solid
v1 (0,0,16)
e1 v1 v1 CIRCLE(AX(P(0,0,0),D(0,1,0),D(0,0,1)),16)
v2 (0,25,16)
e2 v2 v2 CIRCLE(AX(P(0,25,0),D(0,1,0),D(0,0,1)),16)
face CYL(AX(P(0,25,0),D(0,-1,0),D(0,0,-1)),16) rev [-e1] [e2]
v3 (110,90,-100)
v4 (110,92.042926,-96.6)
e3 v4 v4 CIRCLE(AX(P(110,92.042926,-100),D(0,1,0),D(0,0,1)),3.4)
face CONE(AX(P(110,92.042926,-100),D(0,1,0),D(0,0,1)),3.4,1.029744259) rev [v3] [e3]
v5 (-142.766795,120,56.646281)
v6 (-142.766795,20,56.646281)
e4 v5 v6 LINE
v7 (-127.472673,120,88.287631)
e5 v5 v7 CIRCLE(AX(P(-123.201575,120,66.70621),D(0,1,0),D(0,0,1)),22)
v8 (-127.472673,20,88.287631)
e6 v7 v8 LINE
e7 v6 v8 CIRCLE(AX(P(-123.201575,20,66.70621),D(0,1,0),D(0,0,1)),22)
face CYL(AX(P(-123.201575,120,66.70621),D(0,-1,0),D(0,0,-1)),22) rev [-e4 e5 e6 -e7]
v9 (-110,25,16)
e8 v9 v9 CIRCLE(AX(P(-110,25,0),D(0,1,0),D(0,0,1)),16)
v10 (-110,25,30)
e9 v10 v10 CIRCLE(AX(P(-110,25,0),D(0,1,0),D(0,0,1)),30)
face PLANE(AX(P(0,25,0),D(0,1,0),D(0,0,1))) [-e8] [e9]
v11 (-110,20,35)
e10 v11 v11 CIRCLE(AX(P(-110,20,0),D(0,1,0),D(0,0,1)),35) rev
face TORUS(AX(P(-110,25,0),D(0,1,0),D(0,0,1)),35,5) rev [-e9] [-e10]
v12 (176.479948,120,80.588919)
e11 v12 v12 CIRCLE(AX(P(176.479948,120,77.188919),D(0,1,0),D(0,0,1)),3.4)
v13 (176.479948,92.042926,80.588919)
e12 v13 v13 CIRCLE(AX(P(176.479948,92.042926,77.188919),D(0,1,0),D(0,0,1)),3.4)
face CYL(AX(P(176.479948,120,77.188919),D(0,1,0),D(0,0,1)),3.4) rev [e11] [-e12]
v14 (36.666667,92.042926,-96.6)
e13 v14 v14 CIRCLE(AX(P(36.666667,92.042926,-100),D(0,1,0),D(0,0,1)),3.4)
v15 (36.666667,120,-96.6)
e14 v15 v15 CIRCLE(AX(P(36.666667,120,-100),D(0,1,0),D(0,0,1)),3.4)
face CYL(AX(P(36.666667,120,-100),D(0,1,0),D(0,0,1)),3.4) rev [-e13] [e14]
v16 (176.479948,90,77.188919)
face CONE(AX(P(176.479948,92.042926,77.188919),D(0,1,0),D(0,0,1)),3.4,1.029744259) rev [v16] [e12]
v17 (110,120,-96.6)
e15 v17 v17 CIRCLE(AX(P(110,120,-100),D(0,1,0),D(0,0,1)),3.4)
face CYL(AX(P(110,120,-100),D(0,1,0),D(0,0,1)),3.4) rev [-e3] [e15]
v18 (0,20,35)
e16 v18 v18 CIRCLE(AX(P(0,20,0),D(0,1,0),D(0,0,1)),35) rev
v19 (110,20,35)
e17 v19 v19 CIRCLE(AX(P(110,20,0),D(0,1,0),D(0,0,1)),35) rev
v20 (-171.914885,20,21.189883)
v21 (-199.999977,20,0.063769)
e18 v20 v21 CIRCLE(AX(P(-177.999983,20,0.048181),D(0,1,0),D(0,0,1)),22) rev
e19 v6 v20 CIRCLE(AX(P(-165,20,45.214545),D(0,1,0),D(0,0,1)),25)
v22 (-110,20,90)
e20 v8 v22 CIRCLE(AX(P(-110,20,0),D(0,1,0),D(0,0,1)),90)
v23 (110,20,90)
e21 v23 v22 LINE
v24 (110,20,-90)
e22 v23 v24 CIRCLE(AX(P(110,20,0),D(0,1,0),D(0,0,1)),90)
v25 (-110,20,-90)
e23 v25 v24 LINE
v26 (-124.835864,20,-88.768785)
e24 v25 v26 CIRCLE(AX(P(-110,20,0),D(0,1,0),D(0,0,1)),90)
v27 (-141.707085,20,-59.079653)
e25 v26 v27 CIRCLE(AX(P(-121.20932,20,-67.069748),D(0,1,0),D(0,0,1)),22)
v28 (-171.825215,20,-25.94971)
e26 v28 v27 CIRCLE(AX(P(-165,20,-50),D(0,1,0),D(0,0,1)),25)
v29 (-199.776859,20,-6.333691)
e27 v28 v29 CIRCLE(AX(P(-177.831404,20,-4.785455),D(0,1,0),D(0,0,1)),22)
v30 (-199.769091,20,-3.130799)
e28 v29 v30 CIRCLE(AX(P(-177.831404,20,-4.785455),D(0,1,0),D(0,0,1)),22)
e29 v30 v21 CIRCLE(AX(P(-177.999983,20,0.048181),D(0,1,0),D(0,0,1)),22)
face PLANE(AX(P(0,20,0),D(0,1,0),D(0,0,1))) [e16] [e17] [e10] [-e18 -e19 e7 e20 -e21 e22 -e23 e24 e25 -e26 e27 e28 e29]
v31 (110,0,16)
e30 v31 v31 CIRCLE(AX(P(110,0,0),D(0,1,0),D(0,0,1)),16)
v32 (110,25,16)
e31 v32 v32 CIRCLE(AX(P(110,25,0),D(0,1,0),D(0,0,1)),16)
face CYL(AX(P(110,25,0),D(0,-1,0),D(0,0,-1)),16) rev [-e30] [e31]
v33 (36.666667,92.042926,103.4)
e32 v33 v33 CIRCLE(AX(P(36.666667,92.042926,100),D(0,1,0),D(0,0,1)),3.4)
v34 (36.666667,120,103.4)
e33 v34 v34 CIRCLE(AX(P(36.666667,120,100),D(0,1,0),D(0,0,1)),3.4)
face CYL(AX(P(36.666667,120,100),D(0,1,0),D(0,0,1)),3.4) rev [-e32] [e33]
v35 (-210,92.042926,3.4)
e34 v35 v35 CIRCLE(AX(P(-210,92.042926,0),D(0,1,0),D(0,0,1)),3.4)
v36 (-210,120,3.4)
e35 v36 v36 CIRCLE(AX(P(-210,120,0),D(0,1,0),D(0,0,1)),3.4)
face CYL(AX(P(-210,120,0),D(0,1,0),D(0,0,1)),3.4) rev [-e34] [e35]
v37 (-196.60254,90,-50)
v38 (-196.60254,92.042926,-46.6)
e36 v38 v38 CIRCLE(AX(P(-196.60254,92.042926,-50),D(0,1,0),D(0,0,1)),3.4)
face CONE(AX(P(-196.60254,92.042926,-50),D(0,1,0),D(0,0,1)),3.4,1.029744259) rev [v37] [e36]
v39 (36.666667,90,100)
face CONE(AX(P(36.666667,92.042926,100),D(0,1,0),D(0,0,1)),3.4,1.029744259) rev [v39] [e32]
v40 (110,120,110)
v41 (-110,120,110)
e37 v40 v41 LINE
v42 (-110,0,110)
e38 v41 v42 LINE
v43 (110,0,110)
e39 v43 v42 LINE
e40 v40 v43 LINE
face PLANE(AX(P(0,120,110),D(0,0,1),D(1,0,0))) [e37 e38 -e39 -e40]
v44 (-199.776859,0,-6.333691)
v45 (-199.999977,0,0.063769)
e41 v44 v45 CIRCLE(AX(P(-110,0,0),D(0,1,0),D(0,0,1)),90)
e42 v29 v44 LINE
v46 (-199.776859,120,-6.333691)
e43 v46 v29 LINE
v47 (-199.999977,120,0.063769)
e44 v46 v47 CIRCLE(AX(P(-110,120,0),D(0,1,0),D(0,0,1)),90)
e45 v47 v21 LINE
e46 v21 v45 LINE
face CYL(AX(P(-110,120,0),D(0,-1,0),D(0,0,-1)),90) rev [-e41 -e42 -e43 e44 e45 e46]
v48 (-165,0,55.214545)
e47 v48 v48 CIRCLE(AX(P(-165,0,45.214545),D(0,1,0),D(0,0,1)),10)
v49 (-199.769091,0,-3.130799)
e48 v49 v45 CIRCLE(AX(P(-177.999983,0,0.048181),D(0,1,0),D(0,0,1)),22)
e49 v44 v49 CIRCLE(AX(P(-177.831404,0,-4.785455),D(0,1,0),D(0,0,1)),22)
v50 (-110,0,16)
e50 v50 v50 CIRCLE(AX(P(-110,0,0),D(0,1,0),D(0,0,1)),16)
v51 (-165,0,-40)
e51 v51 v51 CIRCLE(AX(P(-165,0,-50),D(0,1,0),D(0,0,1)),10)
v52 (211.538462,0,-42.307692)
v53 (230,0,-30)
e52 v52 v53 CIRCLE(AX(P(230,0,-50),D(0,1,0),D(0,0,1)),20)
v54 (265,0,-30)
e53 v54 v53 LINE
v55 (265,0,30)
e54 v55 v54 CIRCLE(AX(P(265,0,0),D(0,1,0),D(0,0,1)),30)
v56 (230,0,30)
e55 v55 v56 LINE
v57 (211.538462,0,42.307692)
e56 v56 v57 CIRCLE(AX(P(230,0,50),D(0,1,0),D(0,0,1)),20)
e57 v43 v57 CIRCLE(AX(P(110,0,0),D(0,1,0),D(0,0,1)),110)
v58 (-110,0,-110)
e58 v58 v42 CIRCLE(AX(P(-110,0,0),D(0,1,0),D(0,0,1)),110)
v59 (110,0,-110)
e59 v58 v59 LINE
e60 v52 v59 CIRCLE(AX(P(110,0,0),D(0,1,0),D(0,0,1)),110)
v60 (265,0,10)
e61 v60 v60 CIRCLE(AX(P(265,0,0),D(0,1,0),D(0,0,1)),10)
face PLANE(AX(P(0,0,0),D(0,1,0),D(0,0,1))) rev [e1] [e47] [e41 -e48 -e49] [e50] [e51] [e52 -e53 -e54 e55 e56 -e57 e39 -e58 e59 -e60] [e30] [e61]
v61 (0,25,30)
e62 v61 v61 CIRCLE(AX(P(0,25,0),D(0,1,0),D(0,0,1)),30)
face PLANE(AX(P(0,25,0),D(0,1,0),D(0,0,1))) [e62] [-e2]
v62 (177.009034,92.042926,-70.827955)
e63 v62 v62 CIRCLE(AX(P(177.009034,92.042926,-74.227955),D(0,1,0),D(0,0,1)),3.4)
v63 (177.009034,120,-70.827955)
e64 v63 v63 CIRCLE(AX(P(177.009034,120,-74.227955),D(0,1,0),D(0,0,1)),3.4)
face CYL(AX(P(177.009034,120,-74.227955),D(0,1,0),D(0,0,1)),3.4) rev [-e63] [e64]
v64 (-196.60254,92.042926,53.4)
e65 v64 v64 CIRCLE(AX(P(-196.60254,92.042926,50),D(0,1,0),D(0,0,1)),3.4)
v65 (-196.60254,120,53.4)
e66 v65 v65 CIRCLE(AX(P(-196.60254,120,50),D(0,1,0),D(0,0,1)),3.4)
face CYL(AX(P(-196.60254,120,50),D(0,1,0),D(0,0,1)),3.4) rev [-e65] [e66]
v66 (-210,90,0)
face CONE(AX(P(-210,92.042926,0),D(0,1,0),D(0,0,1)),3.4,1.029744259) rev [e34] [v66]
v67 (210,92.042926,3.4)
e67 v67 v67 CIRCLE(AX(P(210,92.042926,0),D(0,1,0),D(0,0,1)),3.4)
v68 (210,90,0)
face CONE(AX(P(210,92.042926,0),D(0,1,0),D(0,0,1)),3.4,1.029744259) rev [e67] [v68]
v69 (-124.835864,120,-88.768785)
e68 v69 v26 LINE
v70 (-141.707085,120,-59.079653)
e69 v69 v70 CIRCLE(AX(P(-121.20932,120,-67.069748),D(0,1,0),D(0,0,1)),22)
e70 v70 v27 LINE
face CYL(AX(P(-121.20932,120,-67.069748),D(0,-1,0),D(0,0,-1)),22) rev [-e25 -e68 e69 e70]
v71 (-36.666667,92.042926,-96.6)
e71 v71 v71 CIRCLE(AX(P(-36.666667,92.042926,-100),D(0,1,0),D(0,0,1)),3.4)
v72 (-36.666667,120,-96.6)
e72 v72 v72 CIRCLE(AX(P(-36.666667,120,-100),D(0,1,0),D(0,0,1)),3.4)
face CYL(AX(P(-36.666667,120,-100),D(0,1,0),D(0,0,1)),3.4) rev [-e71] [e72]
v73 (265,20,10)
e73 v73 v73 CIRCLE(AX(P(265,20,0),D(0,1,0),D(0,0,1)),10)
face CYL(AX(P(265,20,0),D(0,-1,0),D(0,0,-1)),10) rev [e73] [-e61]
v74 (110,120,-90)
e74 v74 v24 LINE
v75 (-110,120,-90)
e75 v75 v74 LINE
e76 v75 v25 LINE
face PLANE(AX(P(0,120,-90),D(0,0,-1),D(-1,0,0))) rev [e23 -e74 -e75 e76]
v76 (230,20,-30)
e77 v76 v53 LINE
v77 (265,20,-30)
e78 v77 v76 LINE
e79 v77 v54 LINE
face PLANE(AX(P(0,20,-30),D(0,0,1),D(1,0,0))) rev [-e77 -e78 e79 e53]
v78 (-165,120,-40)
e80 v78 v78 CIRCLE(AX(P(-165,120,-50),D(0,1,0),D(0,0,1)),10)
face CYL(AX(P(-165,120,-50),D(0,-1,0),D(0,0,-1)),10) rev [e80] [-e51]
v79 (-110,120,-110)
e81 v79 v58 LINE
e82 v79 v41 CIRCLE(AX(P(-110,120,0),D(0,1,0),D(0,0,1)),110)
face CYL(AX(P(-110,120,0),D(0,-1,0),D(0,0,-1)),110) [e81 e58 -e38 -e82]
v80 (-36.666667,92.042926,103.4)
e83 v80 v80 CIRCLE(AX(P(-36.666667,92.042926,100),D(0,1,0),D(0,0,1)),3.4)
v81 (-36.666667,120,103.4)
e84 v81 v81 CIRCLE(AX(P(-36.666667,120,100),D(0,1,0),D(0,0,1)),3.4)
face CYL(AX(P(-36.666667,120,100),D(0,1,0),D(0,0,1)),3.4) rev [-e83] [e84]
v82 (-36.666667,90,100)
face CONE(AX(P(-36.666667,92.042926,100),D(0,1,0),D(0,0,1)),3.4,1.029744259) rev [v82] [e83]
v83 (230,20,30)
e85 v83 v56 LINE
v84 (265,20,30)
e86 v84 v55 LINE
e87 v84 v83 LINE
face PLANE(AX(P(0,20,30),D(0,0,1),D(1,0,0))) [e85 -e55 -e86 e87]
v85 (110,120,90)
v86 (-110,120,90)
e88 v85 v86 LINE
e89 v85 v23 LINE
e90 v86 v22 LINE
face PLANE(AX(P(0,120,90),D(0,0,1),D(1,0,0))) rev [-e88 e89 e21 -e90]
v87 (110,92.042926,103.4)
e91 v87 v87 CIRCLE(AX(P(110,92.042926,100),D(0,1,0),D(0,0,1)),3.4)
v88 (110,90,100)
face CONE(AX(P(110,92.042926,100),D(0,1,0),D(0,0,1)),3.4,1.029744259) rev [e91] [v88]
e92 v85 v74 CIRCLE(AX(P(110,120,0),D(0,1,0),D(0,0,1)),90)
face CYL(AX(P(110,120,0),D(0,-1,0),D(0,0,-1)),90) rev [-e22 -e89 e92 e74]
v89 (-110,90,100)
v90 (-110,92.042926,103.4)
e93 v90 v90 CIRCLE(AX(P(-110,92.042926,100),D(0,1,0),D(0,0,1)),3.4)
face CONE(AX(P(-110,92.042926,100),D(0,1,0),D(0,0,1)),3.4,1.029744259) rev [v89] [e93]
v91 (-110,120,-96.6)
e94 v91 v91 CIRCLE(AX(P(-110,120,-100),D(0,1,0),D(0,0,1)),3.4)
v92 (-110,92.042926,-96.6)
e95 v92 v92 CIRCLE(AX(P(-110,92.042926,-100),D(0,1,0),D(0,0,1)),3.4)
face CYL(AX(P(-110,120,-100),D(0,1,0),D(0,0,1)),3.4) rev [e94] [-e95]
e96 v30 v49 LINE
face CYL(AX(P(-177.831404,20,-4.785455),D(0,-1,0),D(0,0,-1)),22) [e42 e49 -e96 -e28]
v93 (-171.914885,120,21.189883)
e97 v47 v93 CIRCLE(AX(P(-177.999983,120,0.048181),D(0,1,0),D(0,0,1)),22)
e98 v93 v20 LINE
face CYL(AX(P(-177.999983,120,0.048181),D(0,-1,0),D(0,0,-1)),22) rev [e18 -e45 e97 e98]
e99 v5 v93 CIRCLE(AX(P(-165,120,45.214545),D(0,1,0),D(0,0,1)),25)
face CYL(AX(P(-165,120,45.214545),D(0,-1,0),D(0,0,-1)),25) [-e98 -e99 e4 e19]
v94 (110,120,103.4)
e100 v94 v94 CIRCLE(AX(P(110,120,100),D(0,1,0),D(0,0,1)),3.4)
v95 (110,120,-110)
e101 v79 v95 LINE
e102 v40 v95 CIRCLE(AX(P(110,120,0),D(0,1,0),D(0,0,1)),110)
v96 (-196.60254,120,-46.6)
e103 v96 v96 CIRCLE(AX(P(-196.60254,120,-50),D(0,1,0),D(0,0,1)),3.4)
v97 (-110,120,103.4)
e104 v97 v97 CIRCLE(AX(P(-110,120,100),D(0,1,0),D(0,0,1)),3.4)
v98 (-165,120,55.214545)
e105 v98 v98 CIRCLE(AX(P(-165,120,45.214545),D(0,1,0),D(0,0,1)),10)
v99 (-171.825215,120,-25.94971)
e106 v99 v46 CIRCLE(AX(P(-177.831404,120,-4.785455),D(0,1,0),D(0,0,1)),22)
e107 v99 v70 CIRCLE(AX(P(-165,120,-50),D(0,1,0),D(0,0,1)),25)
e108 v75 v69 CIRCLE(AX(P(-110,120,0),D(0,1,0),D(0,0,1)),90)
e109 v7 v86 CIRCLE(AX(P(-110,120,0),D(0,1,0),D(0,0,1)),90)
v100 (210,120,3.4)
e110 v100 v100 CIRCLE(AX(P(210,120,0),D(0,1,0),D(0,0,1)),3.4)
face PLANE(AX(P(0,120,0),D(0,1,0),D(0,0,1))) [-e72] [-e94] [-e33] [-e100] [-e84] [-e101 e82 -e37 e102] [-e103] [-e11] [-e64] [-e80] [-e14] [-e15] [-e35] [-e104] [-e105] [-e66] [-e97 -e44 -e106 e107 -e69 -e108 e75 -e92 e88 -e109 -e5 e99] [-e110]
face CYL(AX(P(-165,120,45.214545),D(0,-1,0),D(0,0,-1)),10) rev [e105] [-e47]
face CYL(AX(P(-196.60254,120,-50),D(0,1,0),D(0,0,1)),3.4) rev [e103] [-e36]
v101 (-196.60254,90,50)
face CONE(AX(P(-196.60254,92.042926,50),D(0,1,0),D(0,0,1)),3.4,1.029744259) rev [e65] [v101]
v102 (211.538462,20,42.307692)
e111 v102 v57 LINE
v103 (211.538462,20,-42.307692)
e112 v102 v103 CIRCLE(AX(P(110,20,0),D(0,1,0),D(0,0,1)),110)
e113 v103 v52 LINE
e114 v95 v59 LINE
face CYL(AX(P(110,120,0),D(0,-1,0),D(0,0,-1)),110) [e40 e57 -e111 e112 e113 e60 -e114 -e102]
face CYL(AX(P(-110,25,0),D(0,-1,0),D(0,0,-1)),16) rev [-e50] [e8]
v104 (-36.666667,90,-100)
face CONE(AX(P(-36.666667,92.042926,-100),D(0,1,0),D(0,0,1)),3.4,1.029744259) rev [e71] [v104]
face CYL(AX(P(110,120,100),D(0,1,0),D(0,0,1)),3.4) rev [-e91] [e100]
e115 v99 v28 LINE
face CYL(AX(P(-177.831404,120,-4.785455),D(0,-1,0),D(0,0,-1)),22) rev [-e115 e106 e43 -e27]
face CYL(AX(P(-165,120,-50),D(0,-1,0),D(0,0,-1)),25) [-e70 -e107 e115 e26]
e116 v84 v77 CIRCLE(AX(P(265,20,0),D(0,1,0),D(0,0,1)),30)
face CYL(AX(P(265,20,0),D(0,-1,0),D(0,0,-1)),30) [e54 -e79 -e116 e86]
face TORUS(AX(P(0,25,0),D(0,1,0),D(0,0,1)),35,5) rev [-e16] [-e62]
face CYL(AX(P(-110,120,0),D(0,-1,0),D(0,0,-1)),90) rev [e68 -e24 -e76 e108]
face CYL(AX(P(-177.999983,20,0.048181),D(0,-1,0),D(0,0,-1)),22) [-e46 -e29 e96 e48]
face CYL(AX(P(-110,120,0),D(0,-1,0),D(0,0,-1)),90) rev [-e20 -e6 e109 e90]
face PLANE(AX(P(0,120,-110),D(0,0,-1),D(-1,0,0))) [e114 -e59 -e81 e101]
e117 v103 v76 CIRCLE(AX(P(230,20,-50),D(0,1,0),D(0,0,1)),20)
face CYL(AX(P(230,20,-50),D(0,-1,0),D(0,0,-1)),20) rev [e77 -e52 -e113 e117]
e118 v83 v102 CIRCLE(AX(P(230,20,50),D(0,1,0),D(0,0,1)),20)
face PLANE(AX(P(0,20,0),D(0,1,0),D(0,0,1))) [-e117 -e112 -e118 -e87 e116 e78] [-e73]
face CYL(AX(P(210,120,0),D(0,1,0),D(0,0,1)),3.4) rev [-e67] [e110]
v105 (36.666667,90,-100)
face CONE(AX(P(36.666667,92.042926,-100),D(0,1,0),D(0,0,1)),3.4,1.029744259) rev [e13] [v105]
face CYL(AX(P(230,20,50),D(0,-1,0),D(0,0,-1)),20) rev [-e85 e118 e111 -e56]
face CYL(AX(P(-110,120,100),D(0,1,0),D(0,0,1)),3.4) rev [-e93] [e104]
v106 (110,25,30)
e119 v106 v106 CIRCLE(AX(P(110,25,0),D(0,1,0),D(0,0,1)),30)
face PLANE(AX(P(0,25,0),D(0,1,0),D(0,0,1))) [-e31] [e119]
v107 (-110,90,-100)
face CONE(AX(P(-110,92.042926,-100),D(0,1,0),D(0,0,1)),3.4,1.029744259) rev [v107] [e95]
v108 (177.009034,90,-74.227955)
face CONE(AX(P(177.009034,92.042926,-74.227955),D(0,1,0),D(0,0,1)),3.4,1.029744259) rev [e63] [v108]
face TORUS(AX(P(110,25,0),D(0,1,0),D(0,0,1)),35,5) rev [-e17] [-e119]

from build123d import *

# Parameters (mm, degrees)
ESBO_O2_R                                      = 30
RESSALTO_EXTRUS_O1_DEPTH                       = 20
ESBO_O2_3_R                                    = 30
ESBO_O2_3_R_2                                  = 16
RESSALTO_EXTRUS_O2_DEPTH                       = 25
FILETE1_R                                      = 5
ESBO_O2_4_R                                    = 10
RESSALTO_EXTRUS_O3_DEPTH                       = 120
ESBO_O2_5_R                                    = 10
RESSALTO_EXTRUS_O4_DEPTH                       = 20
BROCA_DE_ROSQUEAR_PARA_TARRAXA_DE_M8X1_2_D     = 6.8
BROCA_DE_ROSQUEAR_PARA_TARRAXA_DE_M8X1_2_DEPTH = 18.127073895
BROCA_DE_ROSQUEAR_PARA_TARRAXA_DE_M8X1_2_TIP   = 2.042926105
BROCA_DE_ROSQUEAR_PARA_TARRAXA_DE_M1_2X0_D     = 6.8
BROCA_DE_ROSQUEAR_PARA_TARRAXA_DE_M1_2X0_DEPTH = 27.957073895
BROCA_DE_ROSQUEAR_PARA_TARRAXA_DE_M1_2X0_TIP   = 2.042926105


with BuildPart() as part:
    # Esboço2 → Ressalto-extrusão1 (new body)
    with BuildSketch(Plane(origin=(0, 0, 0), x_dir=(1, 0, 0), z_dir=(0, 1, 0))):
        with BuildLine():
            ThreePointArc((-142.766795178, -56.646281478), (-143.009054758, -76.280328146), (-127.472672708, -88.287630552))
            ThreePointArc((-127.472672708, -88.287630552), (-118.778190313, -89.570884638), (-110, -90))
            Line((-110, -90), (110, -90))
            ThreePointArc((110, -90), (200, 0), (110, 90))
            Line((110, 90), (-110, 90))
            ThreePointArc((-110, 90), (-117.443432635, 89.691668011), (-124.835864194, 88.76878468))
            ThreePointArc((-124.835864194, 88.76878468), (-140.336700784, 77.939122352), (-141.707084901, 59.079653418))
            ThreePointArc((-141.707084901, 59.079653418), (-146.501498165, 33.18318015), (-171.82521509, 25.94971021))
            ThreePointArc((-171.82521509, 25.94971021), (-191.746461977, 21.825736054), (-199.769091443, 3.130799391))
            ThreePointArc((-199.769091443, 3.130799391), (-192.469638839, -16.620116582), (-171.914884538, -21.189883063))
            ThreePointArc((-171.914884538, -21.189883063), (-145.688040461, -29.338518263), (-142.766795178, -56.646281478))
        make_face()
        with Locations(Location((-110, 0, 0), (0, 0, 270))):
            Circle(ESBO_O2_R, mode=Mode.SUBTRACT)
        with Locations(Location((0, 0, 0), (0, 0, 270))):
            Circle(ESBO_O2_R, mode=Mode.SUBTRACT)
        with Locations(Location((110, 0, 0), (0, 0, 270))):
            Circle(ESBO_O2_R, mode=Mode.SUBTRACT)
    extrude(amount=RESSALTO_EXTRUS_O1_DEPTH)

    # Esboço2<3> → Ressalto-extrusão2 (add)
    # profile 1 of 3: a face of its own
    with BuildSketch(Plane(origin=(0, 0, 0), x_dir=(1, 0, 0), z_dir=(0, 1, 0))):
        with Locations(Location((-110, 0, 0), (0, 0, 270))):
            Circle(ESBO_O2_3_R)
        with Locations(Location((-110, 0, 0), (0, 0, 270))):
            Circle(ESBO_O2_3_R_2, mode=Mode.SUBTRACT)
    # profile 2 of 3: a face of its own
    with BuildSketch(Plane(origin=(0, 0, 0), x_dir=(1, 0, 0), z_dir=(0, 1, 0))):
        with Locations(Location((0, 0, 0), (0, 0, 270))):
            Circle(ESBO_O2_3_R)
        with Locations(Location((0, 0, 0), (0, 0, 270))):
            Circle(ESBO_O2_3_R_2, mode=Mode.SUBTRACT)
    # profile 3 of 3: a face of its own
    with BuildSketch(Plane(origin=(0, 0, 0), x_dir=(1, 0, 0), z_dir=(0, 1, 0))):
        with Locations(Location((110, 0, 0), (0, 0, 270))):
            Circle(ESBO_O2_3_R)
        with Locations(Location((110, 0, 0), (0, 0, 270))):
            Circle(ESBO_O2_3_R_2, mode=Mode.SUBTRACT)
    extrude(amount=RESSALTO_EXTRUS_O2_DEPTH)

    # Filete1
    filete1_edges = [part.edges().sort_by_distance(p)[0] for p in [
        (0, 20, -30),
        (110, 20, -30),
        (-110, 20, -30),
    ]]
    fillet(filete1_edges, radius=FILETE1_R - 0.0001)  # a hair under: the kernel refuses the full size

    # Esboço2<4> → Ressalto-extrusão3 (add)
    with BuildSketch(Plane(origin=(0, 0, 0), x_dir=(1, 0, 0), z_dir=(0, 1, 0))):
        with BuildLine():
            Line((110, 110), (-110, 110))
            ThreePointArc((-110, 110), (-220, 0), (-110, -110))
            Line((-110, -110), (110, -110))
            ThreePointArc((110, -110), (171.017021585, -91.525532377), (211.538461538, -42.307692308))
            ThreePointArc((211.538461538, -42.307692308), (220, 0), (211.538461538, 42.307692308))
            ThreePointArc((211.538461538, 42.307692308), (171.017021585, 91.525532377), (110, 110))
        make_face()
        with Locations(Location((-165, -45.214544805, 0), (0, 0, 270))):
            Circle(ESBO_O2_4_R, mode=Mode.SUBTRACT)
        with Locations(Location((-165, 50, 0), (0, 0, 270))):
            Circle(ESBO_O2_4_R, mode=Mode.SUBTRACT)
        with BuildLine():
            ThreePointArc((-124.835864194, 88.76878468), (-117.443432635, 89.691668011), (-110, 90))
            Line((-110, 90), (110, 90))
            ThreePointArc((110, 90), (200, 0), (110, -90))
            Line((110, -90), (-110, -90))
            ThreePointArc((-110, -90), (-118.778190313, -89.570884638), (-127.472672708, -88.287630552))
            ThreePointArc((-127.472672708, -88.287630552), (-143.009054758, -76.280328146), (-142.766795178, -56.646281478))
            ThreePointArc((-142.766795178, -56.646281478), (-145.688040461, -29.338518263), (-171.914884538, -21.189883063))
            ThreePointArc((-171.914884538, -21.189883063), (-191.224927441, -17.629444698), (-199.999977409, -0.063768613))
            ThreePointArc((-199.999977409, -0.063768613), (-199.945314351, 3.136945366), (-199.776858723, 6.333690699))
            ThreePointArc((-199.776858723, 6.333690699), (-190.469129565, 22.793450693), (-171.82521509, 25.94971021))
            ThreePointArc((-171.82521509, 25.94971021), (-146.501498165, 33.18318015), (-141.707084901, 59.079653418))
            ThreePointArc((-141.707084901, 59.079653418), (-140.336700784, 77.939122352), (-124.835864194, 88.76878468))
        make_face(mode=Mode.SUBTRACT)
    extrude(amount=RESSALTO_EXTRUS_O3_DEPTH)

    # Esboço2<5> → Ressalto-extrusão4 (add)
    with BuildSketch(Plane(origin=(0, 0, 0), x_dir=(1, 0, 0), z_dir=(0, 1, 0))):
        with BuildLine():
            ThreePointArc((230, 30), (218.905996075, 33.358994113), (211.538461538, 42.307692308))
            ThreePointArc((211.538461538, 42.307692308), (220, 0), (211.538461538, -42.307692308))
            ThreePointArc((211.538461538, -42.307692308), (218.905996075, -33.358994113), (230, -30))
            Line((230, -30), (265, -30))
            ThreePointArc((265, -30), (295, 0), (265, 30))
            Line((265, 30), (230, 30))
        make_face()
        with Locations(Location((265, 0, 0), (0, 0, 270))):
            Circle(ESBO_O2_5_R, mode=Mode.SUBTRACT)
    extrude(amount=RESSALTO_EXTRUS_O4_DEPTH)

    # Broca de rosquear para tarraxa de M8x1.253
    with Locations(Plane(origin=(0, 120, 0), x_dir=(1, 0, 0), z_dir=(0, 1, 0))):
        with Locations((-210, 0), (-196.602540378, 50), (-196.602540378, -50), (-110, 100), (-36.666666667, 100), (36.666666667, 100), (110, 100), (177.00903444, 74.227954999), (210, 0), (176.479948314, -77.188918812), (110, -100), (36.666666667, -100), (-36.666666667, -100), (-110, -100)):
            Hole(BROCA_DE_ROSQUEAR_PARA_TARRAXA_DE_M8X1_2_D / 2, depth=BROCA_DE_ROSQUEAR_PARA_TARRAXA_DE_M8X1_2_DEPTH)
            with Locations((0, 0, -(BROCA_DE_ROSQUEAR_PARA_TARRAXA_DE_M8X1_2_DEPTH + BROCA_DE_ROSQUEAR_PARA_TARRAXA_DE_M8X1_2_TIP / 2))):  # 118° drill point
                Cone(0, BROCA_DE_ROSQUEAR_PARA_TARRAXA_DE_M8X1_2_D / 2, BROCA_DE_ROSQUEAR_PARA_TARRAXA_DE_M8X1_2_TIP, mode=Mode.SUBTRACT)

    # Broca de rosquear para tarraxa de M1.2x0.251
    with Locations(Plane(origin=(0, 120, 0), x_dir=(1, 0, 0), z_dir=(0, 1, 0))):
        with Locations((-196.602540378, 50), (-210, 0), (-196.602540378, -50), (-110, -100), (-110, 100), (-36.666666667, 100), (36.666666667, 100), (-36.666666667, -100), (36.666666667, -100), (110, 100), (177.00903444, 74.227954999), (210, 0), (176.479948314, -77.188918812), (110, -100)):
            Hole(BROCA_DE_ROSQUEAR_PARA_TARRAXA_DE_M1_2X0_D / 2, depth=BROCA_DE_ROSQUEAR_PARA_TARRAXA_DE_M1_2X0_DEPTH)
            with Locations((0, 0, -(BROCA_DE_ROSQUEAR_PARA_TARRAXA_DE_M1_2X0_DEPTH + BROCA_DE_ROSQUEAR_PARA_TARRAXA_DE_M1_2X0_TIP / 2))):  # 118° drill point
                Cone(0, BROCA_DE_ROSQUEAR_PARA_TARRAXA_DE_M1_2X0_D / 2, BROCA_DE_ROSQUEAR_PARA_TARRAXA_DE_M1_2X0_TIP, mode=Mode.SUBTRACT)


solid = part.part
